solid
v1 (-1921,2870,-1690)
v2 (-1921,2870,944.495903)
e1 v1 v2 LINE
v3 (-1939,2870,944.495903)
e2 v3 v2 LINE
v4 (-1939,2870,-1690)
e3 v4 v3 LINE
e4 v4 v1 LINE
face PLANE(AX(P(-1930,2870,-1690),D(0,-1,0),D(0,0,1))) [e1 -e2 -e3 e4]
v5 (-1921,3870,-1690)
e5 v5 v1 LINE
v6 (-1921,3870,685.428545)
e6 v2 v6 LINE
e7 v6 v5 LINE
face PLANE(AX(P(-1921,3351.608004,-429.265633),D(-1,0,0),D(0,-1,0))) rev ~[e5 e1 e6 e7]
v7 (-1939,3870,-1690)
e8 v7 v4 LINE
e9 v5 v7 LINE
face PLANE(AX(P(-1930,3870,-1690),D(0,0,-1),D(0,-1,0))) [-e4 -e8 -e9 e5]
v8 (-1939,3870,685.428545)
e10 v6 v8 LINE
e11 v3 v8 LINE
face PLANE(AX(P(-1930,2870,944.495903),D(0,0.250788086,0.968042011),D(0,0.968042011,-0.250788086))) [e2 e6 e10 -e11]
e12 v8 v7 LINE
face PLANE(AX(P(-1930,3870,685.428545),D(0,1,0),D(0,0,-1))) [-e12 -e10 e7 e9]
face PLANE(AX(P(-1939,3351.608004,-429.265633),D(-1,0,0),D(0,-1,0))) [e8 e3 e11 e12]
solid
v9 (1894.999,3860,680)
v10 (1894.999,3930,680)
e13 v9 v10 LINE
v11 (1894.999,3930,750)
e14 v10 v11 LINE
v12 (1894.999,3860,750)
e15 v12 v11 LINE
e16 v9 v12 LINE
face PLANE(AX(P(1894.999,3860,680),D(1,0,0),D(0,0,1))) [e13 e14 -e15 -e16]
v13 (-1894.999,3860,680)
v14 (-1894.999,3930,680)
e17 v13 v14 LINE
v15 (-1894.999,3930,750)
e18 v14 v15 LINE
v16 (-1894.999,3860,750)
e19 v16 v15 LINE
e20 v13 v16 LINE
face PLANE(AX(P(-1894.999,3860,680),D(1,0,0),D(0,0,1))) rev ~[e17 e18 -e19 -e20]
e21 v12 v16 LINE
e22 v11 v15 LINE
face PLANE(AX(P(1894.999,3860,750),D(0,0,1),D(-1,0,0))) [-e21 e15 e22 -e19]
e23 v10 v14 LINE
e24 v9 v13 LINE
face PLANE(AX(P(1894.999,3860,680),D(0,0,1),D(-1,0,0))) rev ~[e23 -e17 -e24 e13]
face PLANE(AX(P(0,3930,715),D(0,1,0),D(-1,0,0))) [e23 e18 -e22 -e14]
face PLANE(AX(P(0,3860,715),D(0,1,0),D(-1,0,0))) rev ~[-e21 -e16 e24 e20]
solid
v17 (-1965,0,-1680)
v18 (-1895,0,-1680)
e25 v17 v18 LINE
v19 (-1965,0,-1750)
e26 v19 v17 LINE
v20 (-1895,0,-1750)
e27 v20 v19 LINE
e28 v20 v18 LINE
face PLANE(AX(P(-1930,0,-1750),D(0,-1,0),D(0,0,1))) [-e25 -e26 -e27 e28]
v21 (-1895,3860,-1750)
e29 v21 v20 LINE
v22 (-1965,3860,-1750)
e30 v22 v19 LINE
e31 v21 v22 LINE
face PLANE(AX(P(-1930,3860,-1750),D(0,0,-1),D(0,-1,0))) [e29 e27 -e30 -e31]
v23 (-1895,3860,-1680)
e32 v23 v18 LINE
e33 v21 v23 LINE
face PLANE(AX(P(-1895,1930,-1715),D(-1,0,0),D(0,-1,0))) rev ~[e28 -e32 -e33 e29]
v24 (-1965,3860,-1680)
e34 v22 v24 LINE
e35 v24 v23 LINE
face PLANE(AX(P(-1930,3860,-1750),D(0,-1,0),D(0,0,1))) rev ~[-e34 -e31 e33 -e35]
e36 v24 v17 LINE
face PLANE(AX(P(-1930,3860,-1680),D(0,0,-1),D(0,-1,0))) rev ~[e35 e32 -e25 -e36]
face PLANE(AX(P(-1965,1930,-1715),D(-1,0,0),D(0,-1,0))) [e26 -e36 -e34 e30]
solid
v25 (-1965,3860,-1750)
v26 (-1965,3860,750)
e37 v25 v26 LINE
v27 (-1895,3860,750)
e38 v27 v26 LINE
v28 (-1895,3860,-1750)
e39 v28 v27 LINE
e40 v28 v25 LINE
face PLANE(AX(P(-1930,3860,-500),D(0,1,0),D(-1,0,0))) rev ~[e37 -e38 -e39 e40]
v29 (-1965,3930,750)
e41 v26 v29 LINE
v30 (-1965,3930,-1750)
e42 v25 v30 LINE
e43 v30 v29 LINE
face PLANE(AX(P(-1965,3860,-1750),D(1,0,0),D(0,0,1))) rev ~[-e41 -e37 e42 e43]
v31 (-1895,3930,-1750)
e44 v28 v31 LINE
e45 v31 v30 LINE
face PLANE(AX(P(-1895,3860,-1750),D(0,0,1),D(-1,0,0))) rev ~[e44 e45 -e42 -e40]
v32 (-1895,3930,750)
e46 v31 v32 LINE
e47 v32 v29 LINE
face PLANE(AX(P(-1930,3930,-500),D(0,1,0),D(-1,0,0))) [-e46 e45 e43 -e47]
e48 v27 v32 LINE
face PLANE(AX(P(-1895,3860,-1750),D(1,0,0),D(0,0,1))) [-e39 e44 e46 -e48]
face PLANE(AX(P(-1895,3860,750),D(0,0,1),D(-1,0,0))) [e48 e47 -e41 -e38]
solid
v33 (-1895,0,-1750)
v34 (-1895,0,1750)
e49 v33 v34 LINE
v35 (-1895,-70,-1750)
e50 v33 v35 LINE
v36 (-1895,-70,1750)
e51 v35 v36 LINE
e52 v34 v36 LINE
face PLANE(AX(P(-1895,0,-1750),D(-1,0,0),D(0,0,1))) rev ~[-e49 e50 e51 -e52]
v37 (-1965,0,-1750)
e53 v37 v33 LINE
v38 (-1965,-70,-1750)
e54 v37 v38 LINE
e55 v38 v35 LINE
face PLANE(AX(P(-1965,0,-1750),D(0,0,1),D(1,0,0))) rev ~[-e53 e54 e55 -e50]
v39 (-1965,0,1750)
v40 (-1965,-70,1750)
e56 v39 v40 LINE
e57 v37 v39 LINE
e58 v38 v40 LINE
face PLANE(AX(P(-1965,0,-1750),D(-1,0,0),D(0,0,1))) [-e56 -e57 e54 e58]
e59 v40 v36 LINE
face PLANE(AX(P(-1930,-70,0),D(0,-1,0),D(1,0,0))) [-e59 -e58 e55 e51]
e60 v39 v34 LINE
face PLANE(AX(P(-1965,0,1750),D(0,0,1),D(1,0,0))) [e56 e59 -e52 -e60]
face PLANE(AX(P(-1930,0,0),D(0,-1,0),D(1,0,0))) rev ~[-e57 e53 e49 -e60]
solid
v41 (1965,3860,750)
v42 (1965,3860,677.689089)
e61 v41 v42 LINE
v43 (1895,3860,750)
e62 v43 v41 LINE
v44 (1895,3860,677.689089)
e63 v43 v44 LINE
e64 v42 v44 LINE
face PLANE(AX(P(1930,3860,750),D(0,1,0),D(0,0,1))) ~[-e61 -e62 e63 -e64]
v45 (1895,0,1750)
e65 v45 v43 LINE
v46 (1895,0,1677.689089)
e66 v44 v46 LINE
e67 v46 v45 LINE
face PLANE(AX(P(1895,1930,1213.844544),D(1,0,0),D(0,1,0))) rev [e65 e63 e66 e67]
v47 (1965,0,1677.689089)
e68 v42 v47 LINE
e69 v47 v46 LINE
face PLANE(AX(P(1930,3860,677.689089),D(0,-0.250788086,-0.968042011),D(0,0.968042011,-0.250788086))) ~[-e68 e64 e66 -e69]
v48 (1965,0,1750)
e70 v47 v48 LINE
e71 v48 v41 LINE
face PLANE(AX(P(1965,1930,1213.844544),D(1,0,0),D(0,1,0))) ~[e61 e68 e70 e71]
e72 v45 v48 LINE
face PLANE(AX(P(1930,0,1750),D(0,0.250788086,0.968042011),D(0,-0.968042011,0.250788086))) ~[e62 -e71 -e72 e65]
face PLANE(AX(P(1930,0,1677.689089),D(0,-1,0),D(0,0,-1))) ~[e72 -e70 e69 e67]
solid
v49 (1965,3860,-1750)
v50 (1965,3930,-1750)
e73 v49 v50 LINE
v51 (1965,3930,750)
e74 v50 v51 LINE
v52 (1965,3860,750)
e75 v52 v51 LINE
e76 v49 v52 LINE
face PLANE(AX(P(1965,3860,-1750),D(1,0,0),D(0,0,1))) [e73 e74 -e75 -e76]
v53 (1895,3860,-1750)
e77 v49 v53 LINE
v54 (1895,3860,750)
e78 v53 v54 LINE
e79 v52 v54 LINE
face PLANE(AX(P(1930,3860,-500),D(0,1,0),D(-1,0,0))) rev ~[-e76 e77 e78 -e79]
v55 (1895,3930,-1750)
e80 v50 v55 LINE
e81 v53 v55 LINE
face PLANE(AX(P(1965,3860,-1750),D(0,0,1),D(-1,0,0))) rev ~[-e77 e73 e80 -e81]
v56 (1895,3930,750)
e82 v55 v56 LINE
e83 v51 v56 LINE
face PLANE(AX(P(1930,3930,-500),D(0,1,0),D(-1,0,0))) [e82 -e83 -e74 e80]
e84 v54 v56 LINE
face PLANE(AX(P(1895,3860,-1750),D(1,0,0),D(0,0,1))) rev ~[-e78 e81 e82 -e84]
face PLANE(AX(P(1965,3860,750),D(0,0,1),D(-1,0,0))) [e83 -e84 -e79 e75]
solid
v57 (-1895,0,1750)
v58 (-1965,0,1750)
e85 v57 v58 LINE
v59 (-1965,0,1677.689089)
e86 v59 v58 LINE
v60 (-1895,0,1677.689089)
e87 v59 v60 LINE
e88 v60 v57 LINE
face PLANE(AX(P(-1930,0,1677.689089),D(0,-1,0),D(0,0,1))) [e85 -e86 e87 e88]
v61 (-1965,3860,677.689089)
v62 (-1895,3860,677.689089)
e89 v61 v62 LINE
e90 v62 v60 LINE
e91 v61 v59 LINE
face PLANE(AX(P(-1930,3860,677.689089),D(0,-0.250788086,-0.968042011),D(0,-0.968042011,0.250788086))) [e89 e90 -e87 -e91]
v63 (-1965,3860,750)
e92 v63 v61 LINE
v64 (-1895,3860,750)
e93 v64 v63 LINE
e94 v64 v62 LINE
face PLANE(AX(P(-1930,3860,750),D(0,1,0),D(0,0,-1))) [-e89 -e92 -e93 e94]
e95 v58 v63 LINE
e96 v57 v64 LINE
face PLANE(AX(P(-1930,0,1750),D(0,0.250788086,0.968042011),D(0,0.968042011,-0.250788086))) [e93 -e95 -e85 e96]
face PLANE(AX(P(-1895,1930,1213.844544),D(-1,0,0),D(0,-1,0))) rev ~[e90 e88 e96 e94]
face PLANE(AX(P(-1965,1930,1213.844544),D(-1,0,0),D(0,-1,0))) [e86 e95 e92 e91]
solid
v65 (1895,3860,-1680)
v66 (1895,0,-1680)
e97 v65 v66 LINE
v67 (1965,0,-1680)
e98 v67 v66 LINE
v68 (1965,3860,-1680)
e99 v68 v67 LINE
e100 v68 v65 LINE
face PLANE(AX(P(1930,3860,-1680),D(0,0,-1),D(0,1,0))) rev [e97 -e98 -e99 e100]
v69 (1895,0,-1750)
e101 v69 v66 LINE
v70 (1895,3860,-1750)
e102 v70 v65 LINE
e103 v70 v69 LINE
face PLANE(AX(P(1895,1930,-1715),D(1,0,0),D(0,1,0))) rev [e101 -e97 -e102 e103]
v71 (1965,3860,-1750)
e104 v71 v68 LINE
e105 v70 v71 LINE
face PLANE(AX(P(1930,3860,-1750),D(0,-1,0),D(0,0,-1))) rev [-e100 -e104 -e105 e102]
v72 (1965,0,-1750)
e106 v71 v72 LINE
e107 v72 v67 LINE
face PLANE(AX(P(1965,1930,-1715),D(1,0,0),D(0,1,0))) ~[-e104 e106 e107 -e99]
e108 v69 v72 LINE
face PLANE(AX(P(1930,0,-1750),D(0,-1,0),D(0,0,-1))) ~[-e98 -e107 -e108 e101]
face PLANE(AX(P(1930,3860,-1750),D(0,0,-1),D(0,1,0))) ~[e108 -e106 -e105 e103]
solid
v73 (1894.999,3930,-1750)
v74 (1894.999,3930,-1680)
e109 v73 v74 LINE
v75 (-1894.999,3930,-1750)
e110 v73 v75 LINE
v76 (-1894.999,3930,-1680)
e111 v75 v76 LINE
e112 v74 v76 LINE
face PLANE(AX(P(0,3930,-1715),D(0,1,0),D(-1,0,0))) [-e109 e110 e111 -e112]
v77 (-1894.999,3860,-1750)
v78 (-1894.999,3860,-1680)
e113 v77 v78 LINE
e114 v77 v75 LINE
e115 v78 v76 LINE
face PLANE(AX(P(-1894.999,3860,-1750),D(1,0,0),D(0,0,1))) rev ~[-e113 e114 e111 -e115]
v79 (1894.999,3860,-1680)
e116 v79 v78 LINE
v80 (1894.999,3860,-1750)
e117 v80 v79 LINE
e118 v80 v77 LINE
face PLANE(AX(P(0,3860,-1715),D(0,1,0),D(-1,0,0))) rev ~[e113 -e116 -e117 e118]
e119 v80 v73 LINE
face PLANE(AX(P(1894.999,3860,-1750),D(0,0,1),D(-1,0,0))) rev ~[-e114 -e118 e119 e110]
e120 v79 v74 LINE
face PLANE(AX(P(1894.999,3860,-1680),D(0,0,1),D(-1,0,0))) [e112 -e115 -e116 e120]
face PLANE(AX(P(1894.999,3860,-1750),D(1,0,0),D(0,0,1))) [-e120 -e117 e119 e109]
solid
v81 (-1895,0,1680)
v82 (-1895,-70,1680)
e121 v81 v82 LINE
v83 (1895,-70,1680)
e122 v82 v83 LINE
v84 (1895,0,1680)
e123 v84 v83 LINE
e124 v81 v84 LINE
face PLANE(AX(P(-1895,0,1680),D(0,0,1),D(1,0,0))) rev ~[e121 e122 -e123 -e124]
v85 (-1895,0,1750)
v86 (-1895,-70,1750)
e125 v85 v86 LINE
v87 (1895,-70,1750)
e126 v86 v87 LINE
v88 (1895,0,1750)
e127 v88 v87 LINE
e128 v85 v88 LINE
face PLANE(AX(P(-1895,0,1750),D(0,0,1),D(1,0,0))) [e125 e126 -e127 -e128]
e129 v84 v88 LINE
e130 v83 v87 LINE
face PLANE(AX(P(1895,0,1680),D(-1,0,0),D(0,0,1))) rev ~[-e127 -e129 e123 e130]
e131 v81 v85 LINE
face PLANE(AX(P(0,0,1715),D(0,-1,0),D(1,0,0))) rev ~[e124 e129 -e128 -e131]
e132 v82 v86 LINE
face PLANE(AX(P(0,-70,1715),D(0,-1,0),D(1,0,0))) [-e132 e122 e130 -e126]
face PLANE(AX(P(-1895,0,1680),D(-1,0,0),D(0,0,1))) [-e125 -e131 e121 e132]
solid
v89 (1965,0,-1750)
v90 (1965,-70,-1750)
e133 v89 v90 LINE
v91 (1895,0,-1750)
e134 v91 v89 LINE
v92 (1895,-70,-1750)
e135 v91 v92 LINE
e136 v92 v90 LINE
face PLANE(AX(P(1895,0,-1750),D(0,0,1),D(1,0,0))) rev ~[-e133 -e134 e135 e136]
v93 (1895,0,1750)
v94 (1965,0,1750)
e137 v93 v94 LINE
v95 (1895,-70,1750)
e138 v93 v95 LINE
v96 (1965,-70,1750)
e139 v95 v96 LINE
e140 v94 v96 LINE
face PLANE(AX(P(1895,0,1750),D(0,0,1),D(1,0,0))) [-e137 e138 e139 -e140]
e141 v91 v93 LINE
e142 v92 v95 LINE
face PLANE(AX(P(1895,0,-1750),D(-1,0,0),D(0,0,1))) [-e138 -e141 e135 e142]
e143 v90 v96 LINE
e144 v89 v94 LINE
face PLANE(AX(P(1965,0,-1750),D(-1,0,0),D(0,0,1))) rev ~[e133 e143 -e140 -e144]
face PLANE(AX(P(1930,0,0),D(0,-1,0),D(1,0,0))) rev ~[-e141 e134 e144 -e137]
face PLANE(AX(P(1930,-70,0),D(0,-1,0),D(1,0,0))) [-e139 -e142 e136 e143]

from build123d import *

# Parameters (mm, degrees)
F2_W          = 70
F2_H          = 3500
F3_DEPTH      = 70
F4_W          = 3790
F4_H          = 70
F5_DEPTH      = 70
F9_DEPTH      = 35
F9_DEPTH_BACK = 35
F8_W          = 3860
F8_H          = 70
F11_W         = 70
F11_H         = 2500
F12_DEPTH     = 70
F11_W_2       = 3789.998
F11_H_2       = 70
F14_DEPTH     = 9


with BuildPart() as f3:
    # F2 (on Front) → F3 (new body)
    with BuildSketch(Plane.XZ):
        with Locations((-1930, 0)):
            Rectangle(F2_W, F2_H)
    extrude(amount=F3_DEPTH)


with BuildPart() as f3b:
    # F2 (on Front) → F3, piece 2 (new body)
    with BuildSketch(Plane.XZ):
        with Locations((1930, 0)):
            Rectangle(F2_W, F2_H)
    extrude(amount=F3_DEPTH)


with BuildPart() as f5:
    # F4 (on face) → F5 (new body)
    with BuildSketch(Plane.XZ):
        with Locations((0, 1715)):
            Rectangle(F4_W, F4_H)
    extrude(amount=F5_DEPTH)


with BuildPart() as f9:
    # F8 (on offset) → F9 (new body, two sides)
    with BuildSketch(Plane(origin=(-1930, 0, 0), x_dir=(0, -1, 0), z_dir=(-1, 0, 0))) as f9_sk:
        Polygon((0, 1677.6890887274), (0, 1750), (-3860, 750), (-3860, 677.6890887274), align=None)
    extrude(amount=F9_DEPTH)
    extrude(f9_sk.sketch, amount=-F9_DEPTH_BACK)


with BuildPart() as f9b:
    # F8 (on offset) → F9, piece 2 (new body, two sides)
    with BuildSketch(Plane(origin=(-1930, 0, 0), x_dir=(0, -1, 0), z_dir=(-1, 0, 0))) as f9_2_sk:
        with Locations((-1930, -1715)):
            Rectangle(F8_W, F8_H)
    extrude(amount=F9_DEPTH)
    extrude(f9_2_sk.sketch, amount=-F9_DEPTH_BACK)


with BuildPart() as f10_1:
    # F10: instance of F9
    add(f9.part.mirror(Plane.YZ))


with BuildPart() as f10_2:
    # F10: instance of F9b
    add(f9b.part.mirror(Plane.YZ))


with BuildPart() as f12:
    # F11 (on face) → F12 (new body)
    with BuildSketch(Plane(origin=(0, 3860, 0), x_dir=(-1, 0, 0), z_dir=(0, 1, 0))):
        with Locations((-1930, -500)):
            Rectangle(F11_W, F11_H)
    extrude(amount=F12_DEPTH)


with BuildPart() as f12b:
    # F11 (on face) → F12, piece 2 (new body)
    with BuildSketch(Plane(origin=(0, 3860, 0), x_dir=(-1, 0, 0), z_dir=(0, 1, 0))):
        with Locations((1930, -500)):
            Rectangle(F11_W, F11_H)
    extrude(amount=F12_DEPTH)


with BuildPart() as f12c:
    # F11 (on face) → F12, piece 3 (new body)
    with BuildSketch(Plane(origin=(0, 3860, 0), x_dir=(-1, 0, 0), z_dir=(0, 1, 0))):
        with Locations((0, 715)):
            Rectangle(F11_W_2, F11_H_2)
    extrude(amount=F12_DEPTH)


with BuildPart() as f12d:
    # F11 (on face) → F12, piece 4 (new body)
    with BuildSketch(Plane(origin=(0, 3860, 0), x_dir=(-1, 0, 0), z_dir=(0, 1, 0))):
        with Locations((0, -1715)):
            Rectangle(F11_W_2, F11_H_2)
    extrude(amount=F12_DEPTH)


with BuildPart() as f14:
    # F13 (on offset) → F14 (new body, symmetric)
    with BuildSketch(Plane(origin=(-1930, 0, 0), x_dir=(0, -1, 0), z_dir=(-1, 0, 0))):
        Polygon((-2870, 944.495902847), (-3870, 685.4285453341), (-3870, -1690), (-2870, -1690), align=None)
    extrude(amount=F14_DEPTH, both=True)


solid = Compound([f3.part, f3b.part, f5.part, f9.part, f9b.part, f10_1.part, f10_2.part, f12.part, f12b.part, f12c.part, f12d.part, f14.part])
